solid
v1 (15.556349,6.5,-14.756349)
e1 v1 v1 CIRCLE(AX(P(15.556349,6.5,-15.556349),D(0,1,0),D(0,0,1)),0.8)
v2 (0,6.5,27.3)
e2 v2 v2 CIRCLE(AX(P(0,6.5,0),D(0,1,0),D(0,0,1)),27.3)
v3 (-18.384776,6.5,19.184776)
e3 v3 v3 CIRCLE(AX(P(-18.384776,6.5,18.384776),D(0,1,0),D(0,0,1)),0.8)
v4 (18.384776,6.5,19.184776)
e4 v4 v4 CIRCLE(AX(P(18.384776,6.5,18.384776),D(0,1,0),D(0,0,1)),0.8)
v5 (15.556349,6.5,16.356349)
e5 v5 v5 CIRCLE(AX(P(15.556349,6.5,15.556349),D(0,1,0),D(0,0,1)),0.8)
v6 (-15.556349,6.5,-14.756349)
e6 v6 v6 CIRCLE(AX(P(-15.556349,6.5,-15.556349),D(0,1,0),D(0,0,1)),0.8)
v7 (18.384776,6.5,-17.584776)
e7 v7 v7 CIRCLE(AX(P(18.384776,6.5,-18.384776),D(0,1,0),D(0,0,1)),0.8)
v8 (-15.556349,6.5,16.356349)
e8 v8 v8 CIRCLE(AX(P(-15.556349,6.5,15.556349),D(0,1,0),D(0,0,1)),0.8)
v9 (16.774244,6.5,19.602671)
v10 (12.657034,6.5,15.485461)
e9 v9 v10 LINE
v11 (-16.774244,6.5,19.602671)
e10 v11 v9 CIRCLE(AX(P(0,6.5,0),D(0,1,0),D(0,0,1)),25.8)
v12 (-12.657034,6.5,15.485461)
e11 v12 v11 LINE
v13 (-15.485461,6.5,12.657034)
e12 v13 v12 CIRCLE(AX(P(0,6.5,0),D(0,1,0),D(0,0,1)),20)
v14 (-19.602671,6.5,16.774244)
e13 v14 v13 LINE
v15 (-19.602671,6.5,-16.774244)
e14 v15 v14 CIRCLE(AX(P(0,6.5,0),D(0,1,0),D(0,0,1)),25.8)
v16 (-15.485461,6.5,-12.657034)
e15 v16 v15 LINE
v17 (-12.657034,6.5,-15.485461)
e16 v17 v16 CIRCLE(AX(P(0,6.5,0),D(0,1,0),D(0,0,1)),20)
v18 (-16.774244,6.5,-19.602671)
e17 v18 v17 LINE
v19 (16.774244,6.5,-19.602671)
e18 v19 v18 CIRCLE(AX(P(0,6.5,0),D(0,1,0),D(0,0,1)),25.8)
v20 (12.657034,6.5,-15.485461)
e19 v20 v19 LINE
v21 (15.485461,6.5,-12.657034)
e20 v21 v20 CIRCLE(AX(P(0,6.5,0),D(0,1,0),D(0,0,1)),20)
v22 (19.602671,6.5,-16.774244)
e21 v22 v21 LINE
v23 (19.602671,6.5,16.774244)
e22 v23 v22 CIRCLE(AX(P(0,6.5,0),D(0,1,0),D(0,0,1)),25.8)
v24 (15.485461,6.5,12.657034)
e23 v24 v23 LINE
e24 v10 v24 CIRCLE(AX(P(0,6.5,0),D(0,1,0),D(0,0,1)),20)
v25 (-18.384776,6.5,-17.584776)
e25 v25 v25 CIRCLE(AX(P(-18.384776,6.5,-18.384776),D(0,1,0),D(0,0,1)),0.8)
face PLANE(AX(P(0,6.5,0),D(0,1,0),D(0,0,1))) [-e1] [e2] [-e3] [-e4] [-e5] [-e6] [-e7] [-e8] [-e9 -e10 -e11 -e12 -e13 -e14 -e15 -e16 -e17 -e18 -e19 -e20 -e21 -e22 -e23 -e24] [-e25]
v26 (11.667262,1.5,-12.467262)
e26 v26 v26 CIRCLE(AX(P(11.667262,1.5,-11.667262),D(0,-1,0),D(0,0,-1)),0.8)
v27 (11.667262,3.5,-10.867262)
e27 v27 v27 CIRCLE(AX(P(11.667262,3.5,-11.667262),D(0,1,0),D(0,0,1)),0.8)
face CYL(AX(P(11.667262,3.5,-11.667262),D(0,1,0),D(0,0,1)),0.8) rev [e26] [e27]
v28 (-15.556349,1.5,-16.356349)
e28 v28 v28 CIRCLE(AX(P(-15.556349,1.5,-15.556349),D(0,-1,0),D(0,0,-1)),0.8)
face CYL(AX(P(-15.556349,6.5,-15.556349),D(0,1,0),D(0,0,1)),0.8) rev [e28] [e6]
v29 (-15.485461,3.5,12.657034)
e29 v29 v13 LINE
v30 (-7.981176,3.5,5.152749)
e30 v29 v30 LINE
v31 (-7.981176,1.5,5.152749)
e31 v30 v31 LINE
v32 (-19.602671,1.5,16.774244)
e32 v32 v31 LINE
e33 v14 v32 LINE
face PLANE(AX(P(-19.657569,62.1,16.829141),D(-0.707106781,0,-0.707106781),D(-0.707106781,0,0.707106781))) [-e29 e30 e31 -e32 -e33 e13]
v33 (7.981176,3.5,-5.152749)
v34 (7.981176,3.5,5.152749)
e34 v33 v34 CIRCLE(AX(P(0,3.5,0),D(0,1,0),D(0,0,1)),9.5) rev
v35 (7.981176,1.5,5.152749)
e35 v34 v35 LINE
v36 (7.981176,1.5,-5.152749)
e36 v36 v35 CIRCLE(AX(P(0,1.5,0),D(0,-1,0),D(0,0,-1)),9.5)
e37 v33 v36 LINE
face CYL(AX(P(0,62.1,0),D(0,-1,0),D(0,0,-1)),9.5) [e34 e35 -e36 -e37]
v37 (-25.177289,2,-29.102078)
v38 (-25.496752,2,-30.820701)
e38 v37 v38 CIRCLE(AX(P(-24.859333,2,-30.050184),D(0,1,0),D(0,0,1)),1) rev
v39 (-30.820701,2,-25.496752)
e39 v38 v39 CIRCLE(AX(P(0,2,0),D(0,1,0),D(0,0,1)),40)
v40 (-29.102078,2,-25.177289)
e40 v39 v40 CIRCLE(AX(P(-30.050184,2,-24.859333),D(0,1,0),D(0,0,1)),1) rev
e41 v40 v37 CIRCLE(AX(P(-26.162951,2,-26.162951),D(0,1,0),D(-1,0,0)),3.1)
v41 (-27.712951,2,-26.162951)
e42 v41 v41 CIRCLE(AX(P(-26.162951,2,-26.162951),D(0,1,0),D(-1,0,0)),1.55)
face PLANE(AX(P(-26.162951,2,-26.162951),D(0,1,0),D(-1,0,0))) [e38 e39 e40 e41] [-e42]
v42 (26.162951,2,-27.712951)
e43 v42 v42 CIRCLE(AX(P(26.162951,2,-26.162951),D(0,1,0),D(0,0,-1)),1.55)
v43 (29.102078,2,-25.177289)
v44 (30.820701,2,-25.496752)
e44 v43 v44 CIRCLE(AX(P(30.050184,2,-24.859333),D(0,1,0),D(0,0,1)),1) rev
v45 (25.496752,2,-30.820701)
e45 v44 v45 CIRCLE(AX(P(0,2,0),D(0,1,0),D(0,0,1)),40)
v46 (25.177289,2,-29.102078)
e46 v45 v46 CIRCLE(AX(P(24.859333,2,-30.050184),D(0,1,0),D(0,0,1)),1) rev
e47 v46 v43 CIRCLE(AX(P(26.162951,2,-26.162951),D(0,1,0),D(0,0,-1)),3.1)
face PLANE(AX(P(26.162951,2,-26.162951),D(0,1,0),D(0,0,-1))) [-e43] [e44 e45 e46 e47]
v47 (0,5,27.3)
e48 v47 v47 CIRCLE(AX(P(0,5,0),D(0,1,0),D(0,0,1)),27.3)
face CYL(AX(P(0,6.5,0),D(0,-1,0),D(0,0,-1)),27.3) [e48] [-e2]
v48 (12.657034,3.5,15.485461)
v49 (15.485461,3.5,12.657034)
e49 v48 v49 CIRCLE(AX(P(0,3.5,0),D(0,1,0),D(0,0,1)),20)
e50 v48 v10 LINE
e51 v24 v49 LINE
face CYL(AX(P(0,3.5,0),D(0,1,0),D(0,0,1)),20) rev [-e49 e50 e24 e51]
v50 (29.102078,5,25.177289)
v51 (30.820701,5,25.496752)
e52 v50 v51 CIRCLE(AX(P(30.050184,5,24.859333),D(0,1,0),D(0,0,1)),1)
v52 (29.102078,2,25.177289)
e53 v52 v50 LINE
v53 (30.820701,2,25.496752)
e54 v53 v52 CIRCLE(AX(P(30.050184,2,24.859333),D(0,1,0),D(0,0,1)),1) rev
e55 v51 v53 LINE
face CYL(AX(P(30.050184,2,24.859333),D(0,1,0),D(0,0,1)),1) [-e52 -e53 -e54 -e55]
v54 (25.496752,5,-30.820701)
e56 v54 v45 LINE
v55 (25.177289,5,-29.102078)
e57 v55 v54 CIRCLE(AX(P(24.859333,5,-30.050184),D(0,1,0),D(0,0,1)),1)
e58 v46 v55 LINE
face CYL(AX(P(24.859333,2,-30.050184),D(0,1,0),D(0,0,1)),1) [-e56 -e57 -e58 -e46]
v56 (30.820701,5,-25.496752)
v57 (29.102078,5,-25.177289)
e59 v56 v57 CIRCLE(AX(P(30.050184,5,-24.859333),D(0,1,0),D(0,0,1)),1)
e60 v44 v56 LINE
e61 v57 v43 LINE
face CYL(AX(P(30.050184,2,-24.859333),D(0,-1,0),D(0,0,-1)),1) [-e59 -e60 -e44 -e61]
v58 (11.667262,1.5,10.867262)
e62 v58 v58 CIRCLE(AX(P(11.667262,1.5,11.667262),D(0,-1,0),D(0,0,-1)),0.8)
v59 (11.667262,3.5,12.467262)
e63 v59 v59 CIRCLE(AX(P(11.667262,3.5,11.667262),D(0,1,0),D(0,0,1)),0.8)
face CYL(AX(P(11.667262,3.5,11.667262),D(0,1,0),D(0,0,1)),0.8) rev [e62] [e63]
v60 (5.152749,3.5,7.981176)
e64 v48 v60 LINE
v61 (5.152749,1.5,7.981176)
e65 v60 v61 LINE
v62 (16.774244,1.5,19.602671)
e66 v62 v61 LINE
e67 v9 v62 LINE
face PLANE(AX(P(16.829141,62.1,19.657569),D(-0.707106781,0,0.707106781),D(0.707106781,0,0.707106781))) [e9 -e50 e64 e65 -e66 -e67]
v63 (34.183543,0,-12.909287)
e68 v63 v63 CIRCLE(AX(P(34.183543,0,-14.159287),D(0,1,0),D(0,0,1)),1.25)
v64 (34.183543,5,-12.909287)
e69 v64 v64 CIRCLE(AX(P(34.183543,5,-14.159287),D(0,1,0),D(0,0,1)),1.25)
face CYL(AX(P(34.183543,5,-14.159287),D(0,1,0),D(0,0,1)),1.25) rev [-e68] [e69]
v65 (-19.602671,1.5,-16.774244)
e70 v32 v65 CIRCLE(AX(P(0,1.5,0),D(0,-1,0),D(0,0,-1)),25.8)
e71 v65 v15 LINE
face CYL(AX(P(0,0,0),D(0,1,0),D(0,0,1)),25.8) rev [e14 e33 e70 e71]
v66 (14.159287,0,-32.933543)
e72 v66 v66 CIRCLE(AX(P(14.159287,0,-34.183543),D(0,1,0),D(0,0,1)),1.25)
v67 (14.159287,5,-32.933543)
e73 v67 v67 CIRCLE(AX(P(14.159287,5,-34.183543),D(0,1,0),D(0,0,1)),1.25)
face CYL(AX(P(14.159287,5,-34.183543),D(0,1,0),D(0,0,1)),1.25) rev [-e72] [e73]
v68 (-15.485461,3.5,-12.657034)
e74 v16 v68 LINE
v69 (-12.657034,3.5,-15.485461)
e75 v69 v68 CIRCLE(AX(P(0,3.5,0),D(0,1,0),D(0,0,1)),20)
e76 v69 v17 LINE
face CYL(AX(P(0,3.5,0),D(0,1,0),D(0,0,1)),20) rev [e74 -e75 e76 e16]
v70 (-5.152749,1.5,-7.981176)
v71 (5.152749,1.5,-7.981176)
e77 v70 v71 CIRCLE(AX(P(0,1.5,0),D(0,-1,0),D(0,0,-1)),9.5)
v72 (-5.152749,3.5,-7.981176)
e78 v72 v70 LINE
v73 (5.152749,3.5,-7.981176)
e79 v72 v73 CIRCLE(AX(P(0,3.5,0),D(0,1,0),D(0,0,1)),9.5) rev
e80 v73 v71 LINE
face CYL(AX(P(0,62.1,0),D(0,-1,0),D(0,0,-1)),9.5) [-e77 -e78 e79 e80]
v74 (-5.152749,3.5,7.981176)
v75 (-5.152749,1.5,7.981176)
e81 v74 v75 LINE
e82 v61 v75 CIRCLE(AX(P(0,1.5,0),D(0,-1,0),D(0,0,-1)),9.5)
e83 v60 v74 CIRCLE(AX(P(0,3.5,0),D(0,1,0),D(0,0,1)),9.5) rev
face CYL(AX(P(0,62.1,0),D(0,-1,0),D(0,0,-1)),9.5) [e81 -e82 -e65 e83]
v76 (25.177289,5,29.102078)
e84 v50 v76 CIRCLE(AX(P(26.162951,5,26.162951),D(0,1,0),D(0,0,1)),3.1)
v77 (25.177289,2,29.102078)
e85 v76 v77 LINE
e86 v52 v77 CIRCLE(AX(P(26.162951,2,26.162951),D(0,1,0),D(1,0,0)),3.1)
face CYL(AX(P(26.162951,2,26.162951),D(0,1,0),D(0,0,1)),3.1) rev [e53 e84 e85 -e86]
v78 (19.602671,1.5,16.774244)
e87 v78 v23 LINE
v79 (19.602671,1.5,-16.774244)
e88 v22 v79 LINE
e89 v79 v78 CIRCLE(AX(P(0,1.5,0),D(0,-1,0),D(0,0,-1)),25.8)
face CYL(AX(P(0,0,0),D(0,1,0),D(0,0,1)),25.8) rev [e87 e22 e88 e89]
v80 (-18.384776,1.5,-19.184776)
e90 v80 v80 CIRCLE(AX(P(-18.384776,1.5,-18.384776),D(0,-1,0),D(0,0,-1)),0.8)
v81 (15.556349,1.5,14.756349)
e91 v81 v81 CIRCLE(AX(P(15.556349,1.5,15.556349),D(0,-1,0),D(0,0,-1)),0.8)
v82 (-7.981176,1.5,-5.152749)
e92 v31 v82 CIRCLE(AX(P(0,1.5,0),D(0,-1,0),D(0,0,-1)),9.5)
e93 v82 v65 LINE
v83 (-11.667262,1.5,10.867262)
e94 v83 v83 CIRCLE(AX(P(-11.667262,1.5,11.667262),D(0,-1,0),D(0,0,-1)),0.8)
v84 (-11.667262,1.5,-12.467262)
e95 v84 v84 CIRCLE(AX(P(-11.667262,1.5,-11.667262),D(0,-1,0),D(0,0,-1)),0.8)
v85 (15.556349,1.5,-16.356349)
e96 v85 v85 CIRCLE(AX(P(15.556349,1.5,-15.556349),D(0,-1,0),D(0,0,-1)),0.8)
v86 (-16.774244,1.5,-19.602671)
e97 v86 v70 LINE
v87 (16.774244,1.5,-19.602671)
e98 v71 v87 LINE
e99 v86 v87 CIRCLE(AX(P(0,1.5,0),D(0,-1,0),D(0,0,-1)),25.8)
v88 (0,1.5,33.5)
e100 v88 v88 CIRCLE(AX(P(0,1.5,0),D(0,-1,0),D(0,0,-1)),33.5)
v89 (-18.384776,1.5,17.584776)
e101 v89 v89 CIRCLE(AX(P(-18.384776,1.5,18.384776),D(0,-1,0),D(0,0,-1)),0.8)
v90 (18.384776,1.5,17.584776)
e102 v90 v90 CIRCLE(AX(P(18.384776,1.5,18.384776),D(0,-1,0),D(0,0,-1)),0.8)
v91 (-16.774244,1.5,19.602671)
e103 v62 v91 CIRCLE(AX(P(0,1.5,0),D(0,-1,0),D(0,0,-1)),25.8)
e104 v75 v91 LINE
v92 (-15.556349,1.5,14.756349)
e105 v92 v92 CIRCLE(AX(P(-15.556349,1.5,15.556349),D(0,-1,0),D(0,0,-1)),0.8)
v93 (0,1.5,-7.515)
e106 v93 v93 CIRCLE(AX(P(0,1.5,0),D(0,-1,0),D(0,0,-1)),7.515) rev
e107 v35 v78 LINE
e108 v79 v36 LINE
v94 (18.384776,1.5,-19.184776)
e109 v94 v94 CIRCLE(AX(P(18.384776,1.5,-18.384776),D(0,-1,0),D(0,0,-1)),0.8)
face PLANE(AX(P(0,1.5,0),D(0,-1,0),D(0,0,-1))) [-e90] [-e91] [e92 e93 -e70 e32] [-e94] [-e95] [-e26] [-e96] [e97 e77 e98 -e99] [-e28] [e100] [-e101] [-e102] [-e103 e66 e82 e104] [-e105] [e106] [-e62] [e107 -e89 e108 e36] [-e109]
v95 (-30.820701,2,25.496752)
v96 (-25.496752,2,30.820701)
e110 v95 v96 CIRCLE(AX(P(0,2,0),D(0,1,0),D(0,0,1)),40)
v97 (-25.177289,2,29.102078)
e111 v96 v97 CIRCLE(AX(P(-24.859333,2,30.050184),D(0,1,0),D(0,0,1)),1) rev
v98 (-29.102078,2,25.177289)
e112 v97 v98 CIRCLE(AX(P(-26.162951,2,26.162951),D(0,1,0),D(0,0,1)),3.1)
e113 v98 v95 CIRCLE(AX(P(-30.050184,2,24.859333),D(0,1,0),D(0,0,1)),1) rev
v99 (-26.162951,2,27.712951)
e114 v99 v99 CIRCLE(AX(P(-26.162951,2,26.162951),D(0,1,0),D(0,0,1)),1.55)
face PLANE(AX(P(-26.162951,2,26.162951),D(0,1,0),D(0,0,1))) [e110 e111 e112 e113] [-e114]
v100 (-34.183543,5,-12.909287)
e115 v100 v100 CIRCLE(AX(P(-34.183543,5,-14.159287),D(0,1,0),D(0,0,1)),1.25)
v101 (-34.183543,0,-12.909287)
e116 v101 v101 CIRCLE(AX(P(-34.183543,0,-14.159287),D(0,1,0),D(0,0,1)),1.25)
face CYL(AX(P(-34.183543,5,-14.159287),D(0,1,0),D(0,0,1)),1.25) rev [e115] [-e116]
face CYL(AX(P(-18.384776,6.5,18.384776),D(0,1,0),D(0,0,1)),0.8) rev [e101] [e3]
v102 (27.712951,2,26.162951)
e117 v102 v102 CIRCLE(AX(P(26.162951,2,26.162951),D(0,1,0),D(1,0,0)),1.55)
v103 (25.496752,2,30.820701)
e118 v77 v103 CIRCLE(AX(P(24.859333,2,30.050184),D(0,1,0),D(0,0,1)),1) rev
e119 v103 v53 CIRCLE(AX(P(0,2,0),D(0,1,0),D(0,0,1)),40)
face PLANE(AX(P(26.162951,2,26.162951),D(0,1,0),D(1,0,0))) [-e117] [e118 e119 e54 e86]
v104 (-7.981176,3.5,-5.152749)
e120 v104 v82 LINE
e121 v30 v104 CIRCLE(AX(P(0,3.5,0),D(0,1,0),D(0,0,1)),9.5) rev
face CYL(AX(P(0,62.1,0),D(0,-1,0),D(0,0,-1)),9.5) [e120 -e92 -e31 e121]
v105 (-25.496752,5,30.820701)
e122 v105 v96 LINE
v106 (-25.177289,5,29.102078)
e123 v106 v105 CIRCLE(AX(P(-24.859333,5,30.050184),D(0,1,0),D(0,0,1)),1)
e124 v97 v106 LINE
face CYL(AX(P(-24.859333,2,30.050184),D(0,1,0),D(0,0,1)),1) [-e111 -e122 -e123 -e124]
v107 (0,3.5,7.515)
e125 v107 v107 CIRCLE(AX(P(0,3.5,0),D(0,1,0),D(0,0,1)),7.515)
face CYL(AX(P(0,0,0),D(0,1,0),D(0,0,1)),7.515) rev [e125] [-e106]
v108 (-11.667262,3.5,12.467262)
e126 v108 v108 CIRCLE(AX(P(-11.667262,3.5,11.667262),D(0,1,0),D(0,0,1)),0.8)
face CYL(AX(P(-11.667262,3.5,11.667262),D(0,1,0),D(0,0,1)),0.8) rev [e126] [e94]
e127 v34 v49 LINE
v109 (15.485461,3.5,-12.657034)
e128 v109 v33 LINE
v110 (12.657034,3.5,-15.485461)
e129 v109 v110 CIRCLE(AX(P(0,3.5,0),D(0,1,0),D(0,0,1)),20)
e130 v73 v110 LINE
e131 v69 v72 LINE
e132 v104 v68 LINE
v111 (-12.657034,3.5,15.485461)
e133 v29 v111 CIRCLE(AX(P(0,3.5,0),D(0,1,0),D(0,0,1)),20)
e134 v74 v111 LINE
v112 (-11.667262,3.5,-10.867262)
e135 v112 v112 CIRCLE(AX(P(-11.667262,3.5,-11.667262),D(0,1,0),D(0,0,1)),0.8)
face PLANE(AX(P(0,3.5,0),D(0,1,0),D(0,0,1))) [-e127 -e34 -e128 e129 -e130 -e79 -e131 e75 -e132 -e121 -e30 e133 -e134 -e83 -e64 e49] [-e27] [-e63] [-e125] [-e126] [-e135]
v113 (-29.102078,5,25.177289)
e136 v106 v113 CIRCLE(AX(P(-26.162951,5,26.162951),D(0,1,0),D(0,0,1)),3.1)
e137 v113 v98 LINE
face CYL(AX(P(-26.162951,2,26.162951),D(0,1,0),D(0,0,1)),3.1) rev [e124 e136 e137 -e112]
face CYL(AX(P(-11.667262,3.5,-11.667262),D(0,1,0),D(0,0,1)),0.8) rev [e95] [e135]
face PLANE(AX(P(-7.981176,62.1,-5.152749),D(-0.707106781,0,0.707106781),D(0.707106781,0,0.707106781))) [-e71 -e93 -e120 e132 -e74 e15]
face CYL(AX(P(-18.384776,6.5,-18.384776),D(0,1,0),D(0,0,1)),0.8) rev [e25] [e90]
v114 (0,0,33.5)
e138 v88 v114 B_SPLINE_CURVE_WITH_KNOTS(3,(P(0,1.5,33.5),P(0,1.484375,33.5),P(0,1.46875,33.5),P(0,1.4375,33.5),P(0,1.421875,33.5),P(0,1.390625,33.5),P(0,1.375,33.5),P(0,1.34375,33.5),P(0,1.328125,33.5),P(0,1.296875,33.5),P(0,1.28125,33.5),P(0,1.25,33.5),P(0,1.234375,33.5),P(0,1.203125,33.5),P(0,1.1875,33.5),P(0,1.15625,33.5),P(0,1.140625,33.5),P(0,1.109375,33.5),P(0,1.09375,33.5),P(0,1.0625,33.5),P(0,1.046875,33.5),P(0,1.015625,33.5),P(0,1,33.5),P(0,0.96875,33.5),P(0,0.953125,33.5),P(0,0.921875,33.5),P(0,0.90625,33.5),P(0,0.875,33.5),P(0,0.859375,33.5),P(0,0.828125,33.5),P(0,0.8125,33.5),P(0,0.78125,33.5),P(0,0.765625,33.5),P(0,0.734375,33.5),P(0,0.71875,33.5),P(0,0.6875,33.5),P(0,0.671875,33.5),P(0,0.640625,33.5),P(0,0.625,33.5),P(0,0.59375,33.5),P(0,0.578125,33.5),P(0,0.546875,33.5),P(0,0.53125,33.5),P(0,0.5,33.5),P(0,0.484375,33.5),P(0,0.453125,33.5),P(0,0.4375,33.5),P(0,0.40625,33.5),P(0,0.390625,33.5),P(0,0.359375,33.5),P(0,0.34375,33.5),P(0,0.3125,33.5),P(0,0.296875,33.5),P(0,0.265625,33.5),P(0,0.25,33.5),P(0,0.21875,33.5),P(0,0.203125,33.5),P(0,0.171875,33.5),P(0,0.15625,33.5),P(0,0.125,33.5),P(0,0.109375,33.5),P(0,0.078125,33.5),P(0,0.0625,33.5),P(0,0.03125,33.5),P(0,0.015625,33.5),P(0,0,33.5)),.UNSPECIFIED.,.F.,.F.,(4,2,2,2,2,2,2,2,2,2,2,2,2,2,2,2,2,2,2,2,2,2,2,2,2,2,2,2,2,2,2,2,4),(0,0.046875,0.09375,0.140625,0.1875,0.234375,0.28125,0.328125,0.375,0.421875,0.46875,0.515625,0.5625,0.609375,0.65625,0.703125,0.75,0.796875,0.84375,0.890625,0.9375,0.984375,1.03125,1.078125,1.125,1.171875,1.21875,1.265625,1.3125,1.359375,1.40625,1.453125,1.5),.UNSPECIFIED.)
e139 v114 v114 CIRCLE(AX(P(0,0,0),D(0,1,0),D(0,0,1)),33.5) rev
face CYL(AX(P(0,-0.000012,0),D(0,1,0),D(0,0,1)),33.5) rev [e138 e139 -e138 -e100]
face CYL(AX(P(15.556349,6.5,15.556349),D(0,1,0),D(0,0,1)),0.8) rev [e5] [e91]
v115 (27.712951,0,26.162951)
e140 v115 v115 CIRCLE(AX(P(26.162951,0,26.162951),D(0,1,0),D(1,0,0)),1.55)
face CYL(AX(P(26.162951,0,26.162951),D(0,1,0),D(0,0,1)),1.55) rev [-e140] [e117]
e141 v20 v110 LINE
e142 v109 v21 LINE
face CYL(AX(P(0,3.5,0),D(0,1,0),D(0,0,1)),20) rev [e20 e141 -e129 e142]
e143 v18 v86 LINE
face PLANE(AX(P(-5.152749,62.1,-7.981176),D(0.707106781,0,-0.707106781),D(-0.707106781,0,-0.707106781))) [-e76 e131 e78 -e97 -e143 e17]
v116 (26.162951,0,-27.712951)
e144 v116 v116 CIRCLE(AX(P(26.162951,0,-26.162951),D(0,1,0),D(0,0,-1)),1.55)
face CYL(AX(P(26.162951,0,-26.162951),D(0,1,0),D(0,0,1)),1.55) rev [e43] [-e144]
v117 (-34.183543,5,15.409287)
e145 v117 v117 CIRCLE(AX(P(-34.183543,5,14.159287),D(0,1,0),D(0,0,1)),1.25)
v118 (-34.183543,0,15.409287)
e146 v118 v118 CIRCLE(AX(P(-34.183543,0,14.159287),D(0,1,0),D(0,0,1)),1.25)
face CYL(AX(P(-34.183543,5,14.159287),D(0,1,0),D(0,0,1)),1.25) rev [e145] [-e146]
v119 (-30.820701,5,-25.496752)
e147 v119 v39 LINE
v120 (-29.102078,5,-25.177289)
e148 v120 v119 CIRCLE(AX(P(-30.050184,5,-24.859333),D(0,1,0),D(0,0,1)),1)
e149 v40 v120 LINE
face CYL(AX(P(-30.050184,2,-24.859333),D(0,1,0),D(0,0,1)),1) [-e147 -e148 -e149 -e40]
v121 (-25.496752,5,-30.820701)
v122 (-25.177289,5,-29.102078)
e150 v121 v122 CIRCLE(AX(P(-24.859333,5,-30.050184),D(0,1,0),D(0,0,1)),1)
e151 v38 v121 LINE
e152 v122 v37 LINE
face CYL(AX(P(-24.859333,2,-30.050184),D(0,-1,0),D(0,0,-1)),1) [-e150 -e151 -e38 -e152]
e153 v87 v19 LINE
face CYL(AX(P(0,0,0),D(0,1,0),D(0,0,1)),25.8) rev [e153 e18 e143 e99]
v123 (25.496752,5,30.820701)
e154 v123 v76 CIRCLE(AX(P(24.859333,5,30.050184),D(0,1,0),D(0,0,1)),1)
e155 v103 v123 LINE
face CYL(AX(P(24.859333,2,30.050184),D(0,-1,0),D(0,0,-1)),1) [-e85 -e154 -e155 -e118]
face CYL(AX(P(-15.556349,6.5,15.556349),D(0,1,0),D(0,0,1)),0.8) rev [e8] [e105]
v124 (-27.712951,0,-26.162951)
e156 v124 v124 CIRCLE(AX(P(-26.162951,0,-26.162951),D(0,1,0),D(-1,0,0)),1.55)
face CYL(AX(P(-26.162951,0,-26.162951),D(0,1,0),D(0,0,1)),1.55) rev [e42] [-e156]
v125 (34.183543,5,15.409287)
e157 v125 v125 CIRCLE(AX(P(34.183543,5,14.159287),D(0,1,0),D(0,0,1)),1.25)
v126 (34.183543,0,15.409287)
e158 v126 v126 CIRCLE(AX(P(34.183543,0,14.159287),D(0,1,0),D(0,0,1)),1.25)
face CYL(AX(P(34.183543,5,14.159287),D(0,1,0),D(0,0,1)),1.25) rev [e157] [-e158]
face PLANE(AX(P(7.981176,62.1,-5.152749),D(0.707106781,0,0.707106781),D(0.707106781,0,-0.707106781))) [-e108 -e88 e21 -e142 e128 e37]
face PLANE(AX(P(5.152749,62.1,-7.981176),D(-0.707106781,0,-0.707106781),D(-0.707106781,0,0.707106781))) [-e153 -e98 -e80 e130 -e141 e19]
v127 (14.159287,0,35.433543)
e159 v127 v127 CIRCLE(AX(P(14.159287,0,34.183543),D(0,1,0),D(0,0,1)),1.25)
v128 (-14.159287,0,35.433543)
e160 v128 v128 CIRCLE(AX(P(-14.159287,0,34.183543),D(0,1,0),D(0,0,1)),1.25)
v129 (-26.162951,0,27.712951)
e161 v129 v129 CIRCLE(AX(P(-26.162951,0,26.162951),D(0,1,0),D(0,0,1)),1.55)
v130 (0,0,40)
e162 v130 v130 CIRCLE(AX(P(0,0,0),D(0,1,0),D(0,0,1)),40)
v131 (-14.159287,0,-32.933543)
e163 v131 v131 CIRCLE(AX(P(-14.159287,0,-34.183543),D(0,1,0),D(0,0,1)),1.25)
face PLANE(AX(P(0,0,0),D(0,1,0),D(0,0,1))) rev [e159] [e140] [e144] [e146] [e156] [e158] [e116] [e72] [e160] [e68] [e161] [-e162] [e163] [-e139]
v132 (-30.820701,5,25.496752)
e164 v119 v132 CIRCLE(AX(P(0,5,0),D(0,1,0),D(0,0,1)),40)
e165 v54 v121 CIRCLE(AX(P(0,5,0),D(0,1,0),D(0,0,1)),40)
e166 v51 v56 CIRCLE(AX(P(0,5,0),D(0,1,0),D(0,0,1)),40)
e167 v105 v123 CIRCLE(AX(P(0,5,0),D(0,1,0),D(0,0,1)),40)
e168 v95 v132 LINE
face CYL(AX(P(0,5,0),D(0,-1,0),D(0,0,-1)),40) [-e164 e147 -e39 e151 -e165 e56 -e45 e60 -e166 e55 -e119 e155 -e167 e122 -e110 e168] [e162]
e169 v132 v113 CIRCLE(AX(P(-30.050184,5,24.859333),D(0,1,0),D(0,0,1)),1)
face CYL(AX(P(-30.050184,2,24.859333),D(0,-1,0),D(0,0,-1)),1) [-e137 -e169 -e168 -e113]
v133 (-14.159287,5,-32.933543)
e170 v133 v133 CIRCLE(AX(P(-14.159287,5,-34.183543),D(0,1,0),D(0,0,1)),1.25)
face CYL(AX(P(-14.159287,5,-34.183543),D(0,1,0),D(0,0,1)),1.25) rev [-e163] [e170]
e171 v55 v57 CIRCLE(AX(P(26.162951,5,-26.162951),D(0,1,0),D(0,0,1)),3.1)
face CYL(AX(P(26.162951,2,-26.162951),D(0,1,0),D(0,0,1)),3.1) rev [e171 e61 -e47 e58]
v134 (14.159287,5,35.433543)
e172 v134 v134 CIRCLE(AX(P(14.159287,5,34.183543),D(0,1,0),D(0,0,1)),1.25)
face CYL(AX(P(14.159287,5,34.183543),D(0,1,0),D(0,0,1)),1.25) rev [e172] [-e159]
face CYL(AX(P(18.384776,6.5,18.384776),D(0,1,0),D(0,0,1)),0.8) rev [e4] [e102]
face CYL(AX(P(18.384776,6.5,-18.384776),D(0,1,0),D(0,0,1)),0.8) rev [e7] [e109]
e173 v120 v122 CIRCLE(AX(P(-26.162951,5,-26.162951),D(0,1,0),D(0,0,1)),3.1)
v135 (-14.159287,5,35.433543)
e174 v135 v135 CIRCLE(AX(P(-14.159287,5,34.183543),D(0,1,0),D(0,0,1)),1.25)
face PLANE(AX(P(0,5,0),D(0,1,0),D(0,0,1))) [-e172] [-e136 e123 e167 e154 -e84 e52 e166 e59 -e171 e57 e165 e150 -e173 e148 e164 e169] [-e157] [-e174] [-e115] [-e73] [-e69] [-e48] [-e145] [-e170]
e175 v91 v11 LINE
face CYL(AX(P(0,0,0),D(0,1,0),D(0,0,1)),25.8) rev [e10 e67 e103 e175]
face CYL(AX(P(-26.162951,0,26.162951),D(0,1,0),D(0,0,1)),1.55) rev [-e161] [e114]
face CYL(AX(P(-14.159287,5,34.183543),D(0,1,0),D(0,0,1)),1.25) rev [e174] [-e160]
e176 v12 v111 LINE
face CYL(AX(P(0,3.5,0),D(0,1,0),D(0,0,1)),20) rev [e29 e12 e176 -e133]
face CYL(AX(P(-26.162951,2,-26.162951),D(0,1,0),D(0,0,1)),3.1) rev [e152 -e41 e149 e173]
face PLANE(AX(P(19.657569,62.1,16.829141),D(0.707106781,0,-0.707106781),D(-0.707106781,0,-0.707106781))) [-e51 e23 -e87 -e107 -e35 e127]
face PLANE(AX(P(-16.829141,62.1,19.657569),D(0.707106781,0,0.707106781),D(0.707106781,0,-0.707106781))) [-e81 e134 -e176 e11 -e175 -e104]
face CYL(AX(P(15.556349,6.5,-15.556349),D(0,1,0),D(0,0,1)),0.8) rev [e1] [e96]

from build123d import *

# Parameters (mm, degrees)
SKETCH_1_R                       = 40
EXTRUDE_1_DEPTH                  = 5
CUT_EXTRUDE_1_DEPTH              = 57.789083458
CUT_EXTRUDE_1_DEPTH_BACK         = 1.5
SKETCH_2_R                       = 33.5
SKETCH_7_R                       = 27.3
EXTRUDE_3_DEPTH                  = 1.5
SKETCH_3_R                       = 25.8
CUT_EXTRUDE_2_DEPTH              = 57.940758688
EXTRUDE_2_DEPTH                  = 5
CUT_EXTRUDE_3_DEPTH              = 57.789083458
CUT_EXTRUDE_3_DEPTH_BACK         = 4
SKETCH_5_R                       = 7.515
CUT_EXTRUDE_4_DEPTH              = 57.835288334
CUT_EXTRUDE_4_DEPTH_BACK         = 57.835288334
SKETCH_6_R                       = 6.5
SKETCH_8_R                       = 20
SKETCH_8_R_2                     = 4.5
CUT_EXTRUDE_5_DEPTH              = 3
HOLE_WIZARD_M2_1_D               = 1.6
HOLE_WIZARD_M2_6_D               = 1.6
HOLE_WIZARD_M3_1_OUTLINE_R       = 1.25
HOLE_WIZARD_M3_1_DEPTH           = 5
SKETCH_25_R                      = 3.1
CUT_EXTRUDE_7_DEPTH              = 3
SKETCH_26_R                      = 1.55
CUT_EXTRUDE_8_DEPTH              = 57.747246629
FILLET_1_R                       = 1
PATTERN_CIRCULAR_1_COUNT         = 4
FILLET_1_OF_PATTERN_CIRCULAR_1_R = 1


# Read off the part's stored shape, not the designer's step: M3 螺纹孔1
with BuildPart() as part:
    # 草图1 → 凸台-拉伸1 (new body)
    with BuildSketch(Plane(origin=(0, 0, 0), x_dir=(1, 0, 0), z_dir=(0, 1, 0))):
        with Locations(Location((0, 0, 0), (0, 0, 270))):
            Circle(SKETCH_1_R)
    extrude(amount=EXTRUDE_1_DEPTH)

    # 草图2 → 切除-拉伸1 (cut, two sides: drawn at the far end of the back side and taken through both)
    with BuildSketch(Plane.XZ.offset(-CUT_EXTRUDE_1_DEPTH_BACK)):
        with Locations(Location((0, 0, 0), (0, 0, 90))):
            Circle(SKETCH_2_R)
    extrude(amount=CUT_EXTRUDE_1_DEPTH + CUT_EXTRUDE_1_DEPTH_BACK, mode=Mode.SUBTRACT)

    # 草图7 → 凸台-拉伸3 (add)
    with BuildSketch(Plane(origin=(0, 5, 0), x_dir=(1, 0, 0), z_dir=(0, 1, 0))):
        with Locations(Location((0, 0, 0), (0, 0, 270))):
            Circle(SKETCH_7_R)
    extrude(amount=EXTRUDE_3_DEPTH)

    # 草图3 → 切除-拉伸2 (cut, through all)
    with BuildSketch(Plane(origin=(0, 6.5, 0), x_dir=(1, 0, 0), z_dir=(0, 1, 0))):
        with Locations(Location((0, 0, 0), (0, 0, 270))):
            Circle(SKETCH_3_R)
    extrude(amount=-CUT_EXTRUDE_2_DEPTH, mode=Mode.SUBTRACT)

    # 草图4 → 凸台-拉伸2 (add)
    with BuildSketch(Plane.XZ.offset(-1.5)):
        with BuildLine():
            Line((-19.657568517, 16.829141392), (-7.981176331, 5.152749206))
            ThreePointArc((-7.981176331, 5.152749206), (-9.5, 0), (-7.981176331, -5.152749206))
            Line((-7.981176331, -5.152749206), (-19.657568517, -16.829141392))
            Line((-19.657568517, -16.829141392), (-16.829141392, -19.657568517))
            Line((-16.829141392, -19.657568517), (-5.152749206, -7.981176331))
            ThreePointArc((-5.152749206, -7.981176331), (0, -9.5), (5.152749206, -7.981176331))
            Line((5.152749206, -7.981176331), (16.829141392, -19.657568517))
            Line((16.829141392, -19.657568517), (19.657568517, -16.829141392))
            Line((19.657568517, -16.829141392), (7.981176331, -5.152749206))
            ThreePointArc((7.981176331, -5.152749206), (9.5, 0), (7.981176331, 5.152749206))
            Line((7.981176331, 5.152749206), (19.657568517, 16.829141392))
            Line((19.657568517, 16.829141392), (16.829141392, 19.657568517))
            Line((16.829141392, 19.657568517), (5.152749206, 7.981176331))
            ThreePointArc((5.152749206, 7.981176331), (0, 9.5), (-5.152749206, 7.981176331))
            Line((-5.152749206, 7.981176331), (-16.829141392, 19.657568517))
            Line((-16.829141392, 19.657568517), (-19.657568517, 16.829141392))
        make_face()
    extrude(amount=-EXTRUDE_2_DEPTH)

    # 草图5 → 切除-拉伸3 (cut, two sides: drawn at the far end of the back side and taken through both)
    with BuildSketch(Plane.XZ.offset(-1.5).offset(-CUT_EXTRUDE_3_DEPTH_BACK)):
        with Locations(Location((0, 0, 0), (0, 0, 270))):
            Circle(SKETCH_5_R)
    extrude(amount=CUT_EXTRUDE_3_DEPTH + CUT_EXTRUDE_3_DEPTH_BACK, mode=Mode.SUBTRACT)

    # 草图6 → 切除-拉伸4 (cut, two sides: drawn at the far end of the back side and taken through both)
    with BuildSketch(Plane.XZ.offset(-5.5).offset(-CUT_EXTRUDE_4_DEPTH_BACK)):
        with Locations(Location((0, 0, 0), (0, 0, 270))):
            Circle(SKETCH_6_R)
    extrude(amount=CUT_EXTRUDE_4_DEPTH + CUT_EXTRUDE_4_DEPTH_BACK, mode=Mode.SUBTRACT)

    # 草图8 → 切除-拉伸5 (cut)
    with BuildSketch(Plane(origin=(0, 6.5, 0), x_dir=(1, 0, 0), z_dir=(0, 1, 0))):
        Circle(SKETCH_8_R)
        Circle(SKETCH_8_R_2, mode=Mode.SUBTRACT)
    extrude(amount=-CUT_EXTRUDE_5_DEPTH, mode=Mode.SUBTRACT)

    # M2 螺纹孔1 (through all)
    with Locations(Plane(origin=(0, 3.5, 0), x_dir=(1, 0, 0), z_dir=(0, 1, 0))):
        with Locations((0, 0), (-11.66726189, 11.66726189), (11.66726189, 11.66726189), (11.66726189, -11.66726189), (-11.66726189, -11.66726189)):
            Hole(HOLE_WIZARD_M2_1_D / 2)

    # M2 螺纹孔6 (through all)
    with Locations(Plane(origin=(0, 6.5, 0), x_dir=(1, 0, 0), z_dir=(0, 1, 0))):
        with Locations((15.556349186, 15.556349186), (0, 0), (-15.556349186, 15.556349186), (-15.556349186, -15.556349186), (15.556349186, -15.556349186), (-18.384776311, 18.384776311), (18.384776311, 18.384776311), (18.384776311, -18.384776311), (-18.384776311, -18.384776311)):
            Hole(HOLE_WIZARD_M2_6_D / 2)

    # M3 螺纹孔1 outline → M3 螺纹孔1 (cut)
    with BuildSketch(Plane(origin=(0, 0, 0), x_dir=(1, 0, 0), z_dir=(0, 1, 0))):
        with Locations((34.183542703, 14.159286998)):
            Circle(HOLE_WIZARD_M3_1_OUTLINE_R)
        with Locations((34.183542703, -14.159286998)):
            Circle(HOLE_WIZARD_M3_1_OUTLINE_R)
        with Locations((14.159286998, -34.183542703)):
            Circle(HOLE_WIZARD_M3_1_OUTLINE_R)
        with Locations((-14.159286998, -34.183542703)):
            Circle(HOLE_WIZARD_M3_1_OUTLINE_R)
        with Locations((-34.183542703, -14.159286998)):
            Circle(HOLE_WIZARD_M3_1_OUTLINE_R)
        with Locations((-34.183542703, 14.159286998)):
            Circle(HOLE_WIZARD_M3_1_OUTLINE_R)
        with Locations((-14.159286998, 34.183542703)):
            Circle(HOLE_WIZARD_M3_1_OUTLINE_R)
        with Locations((14.159286998, 34.183542703)):
            Circle(HOLE_WIZARD_M3_1_OUTLINE_R)
    extrude(amount=HOLE_WIZARD_M3_1_DEPTH, mode=Mode.SUBTRACT)

    # 草图25 → 切除-拉伸7 (cut)
    with BuildSketch(Plane(origin=(0, 5, 0), x_dir=(1, 0, 0), z_dir=(0, 1, 0))):
        with Locations((-26.162950904, -26.162950904)):
            Circle(SKETCH_25_R)
    cut_extrude_7 = extrude(amount=-CUT_EXTRUDE_7_DEPTH, mode=Mode.SUBTRACT)

    # 草图26 → 切除-拉伸8 (cut, through all)
    with BuildSketch(Plane(origin=(0, 2, 0), x_dir=(1, 0, 0), z_dir=(0, 1, 0))):
        with Locations(Location((-26.162950904, -26.162950904, 0), (0, 0, 270))):
            Circle(SKETCH_26_R)
    cut_extrude_8 = extrude(amount=-CUT_EXTRUDE_8_DEPTH, mode=Mode.SUBTRACT)

    # 圆角1
    fillet_1_edges = [part.edges().sort_by_distance(p)[0] for p in [
        (-28.852633786, 3.5, 27.704251003),
        (-27.704251003, 3.5, 28.852633786),
    ]]
    fillet(fillet_1_edges, radius=FILLET_1_R)

    # 阵列(圆周)1: 切除-拉伸7, 切除-拉伸8 ×4 about axis
    pattern_circular_1_axis = Axis((0, 0, 0), (0, 1, 0))
    add([cut_extrude_7.rotate(pattern_circular_1_axis, i * 360 / PATTERN_CIRCULAR_1_COUNT) for i in range(1, PATTERN_CIRCULAR_1_COUNT)], mode=Mode.SUBTRACT)
    add([cut_extrude_8.rotate(pattern_circular_1_axis, i * 360 / PATTERN_CIRCULAR_1_COUNT) for i in range(1, PATTERN_CIRCULAR_1_COUNT)], mode=Mode.SUBTRACT)

    # 圆角1 of 阵列(圆周)1
    fillet_1_of_pattern_circular_1_edges = [part.edges().sort_by_distance(p)[0] for p in [
        (27.704251003, 3.5, 28.852633786),
        (28.852633786, 3.5, 27.704251003),
        (28.852633786, 3.5, -27.704251003),
        (27.704251003, 3.5, -28.852633786),
        (-27.704251003, 3.5, -28.852633786),
        (-28.852633786, 3.5, -27.704251003),
    ]]
    fillet(fillet_1_of_pattern_circular_1_edges, radius=FILLET_1_OF_PATTERN_CIRCULAR_1_R)


solid = part.part
